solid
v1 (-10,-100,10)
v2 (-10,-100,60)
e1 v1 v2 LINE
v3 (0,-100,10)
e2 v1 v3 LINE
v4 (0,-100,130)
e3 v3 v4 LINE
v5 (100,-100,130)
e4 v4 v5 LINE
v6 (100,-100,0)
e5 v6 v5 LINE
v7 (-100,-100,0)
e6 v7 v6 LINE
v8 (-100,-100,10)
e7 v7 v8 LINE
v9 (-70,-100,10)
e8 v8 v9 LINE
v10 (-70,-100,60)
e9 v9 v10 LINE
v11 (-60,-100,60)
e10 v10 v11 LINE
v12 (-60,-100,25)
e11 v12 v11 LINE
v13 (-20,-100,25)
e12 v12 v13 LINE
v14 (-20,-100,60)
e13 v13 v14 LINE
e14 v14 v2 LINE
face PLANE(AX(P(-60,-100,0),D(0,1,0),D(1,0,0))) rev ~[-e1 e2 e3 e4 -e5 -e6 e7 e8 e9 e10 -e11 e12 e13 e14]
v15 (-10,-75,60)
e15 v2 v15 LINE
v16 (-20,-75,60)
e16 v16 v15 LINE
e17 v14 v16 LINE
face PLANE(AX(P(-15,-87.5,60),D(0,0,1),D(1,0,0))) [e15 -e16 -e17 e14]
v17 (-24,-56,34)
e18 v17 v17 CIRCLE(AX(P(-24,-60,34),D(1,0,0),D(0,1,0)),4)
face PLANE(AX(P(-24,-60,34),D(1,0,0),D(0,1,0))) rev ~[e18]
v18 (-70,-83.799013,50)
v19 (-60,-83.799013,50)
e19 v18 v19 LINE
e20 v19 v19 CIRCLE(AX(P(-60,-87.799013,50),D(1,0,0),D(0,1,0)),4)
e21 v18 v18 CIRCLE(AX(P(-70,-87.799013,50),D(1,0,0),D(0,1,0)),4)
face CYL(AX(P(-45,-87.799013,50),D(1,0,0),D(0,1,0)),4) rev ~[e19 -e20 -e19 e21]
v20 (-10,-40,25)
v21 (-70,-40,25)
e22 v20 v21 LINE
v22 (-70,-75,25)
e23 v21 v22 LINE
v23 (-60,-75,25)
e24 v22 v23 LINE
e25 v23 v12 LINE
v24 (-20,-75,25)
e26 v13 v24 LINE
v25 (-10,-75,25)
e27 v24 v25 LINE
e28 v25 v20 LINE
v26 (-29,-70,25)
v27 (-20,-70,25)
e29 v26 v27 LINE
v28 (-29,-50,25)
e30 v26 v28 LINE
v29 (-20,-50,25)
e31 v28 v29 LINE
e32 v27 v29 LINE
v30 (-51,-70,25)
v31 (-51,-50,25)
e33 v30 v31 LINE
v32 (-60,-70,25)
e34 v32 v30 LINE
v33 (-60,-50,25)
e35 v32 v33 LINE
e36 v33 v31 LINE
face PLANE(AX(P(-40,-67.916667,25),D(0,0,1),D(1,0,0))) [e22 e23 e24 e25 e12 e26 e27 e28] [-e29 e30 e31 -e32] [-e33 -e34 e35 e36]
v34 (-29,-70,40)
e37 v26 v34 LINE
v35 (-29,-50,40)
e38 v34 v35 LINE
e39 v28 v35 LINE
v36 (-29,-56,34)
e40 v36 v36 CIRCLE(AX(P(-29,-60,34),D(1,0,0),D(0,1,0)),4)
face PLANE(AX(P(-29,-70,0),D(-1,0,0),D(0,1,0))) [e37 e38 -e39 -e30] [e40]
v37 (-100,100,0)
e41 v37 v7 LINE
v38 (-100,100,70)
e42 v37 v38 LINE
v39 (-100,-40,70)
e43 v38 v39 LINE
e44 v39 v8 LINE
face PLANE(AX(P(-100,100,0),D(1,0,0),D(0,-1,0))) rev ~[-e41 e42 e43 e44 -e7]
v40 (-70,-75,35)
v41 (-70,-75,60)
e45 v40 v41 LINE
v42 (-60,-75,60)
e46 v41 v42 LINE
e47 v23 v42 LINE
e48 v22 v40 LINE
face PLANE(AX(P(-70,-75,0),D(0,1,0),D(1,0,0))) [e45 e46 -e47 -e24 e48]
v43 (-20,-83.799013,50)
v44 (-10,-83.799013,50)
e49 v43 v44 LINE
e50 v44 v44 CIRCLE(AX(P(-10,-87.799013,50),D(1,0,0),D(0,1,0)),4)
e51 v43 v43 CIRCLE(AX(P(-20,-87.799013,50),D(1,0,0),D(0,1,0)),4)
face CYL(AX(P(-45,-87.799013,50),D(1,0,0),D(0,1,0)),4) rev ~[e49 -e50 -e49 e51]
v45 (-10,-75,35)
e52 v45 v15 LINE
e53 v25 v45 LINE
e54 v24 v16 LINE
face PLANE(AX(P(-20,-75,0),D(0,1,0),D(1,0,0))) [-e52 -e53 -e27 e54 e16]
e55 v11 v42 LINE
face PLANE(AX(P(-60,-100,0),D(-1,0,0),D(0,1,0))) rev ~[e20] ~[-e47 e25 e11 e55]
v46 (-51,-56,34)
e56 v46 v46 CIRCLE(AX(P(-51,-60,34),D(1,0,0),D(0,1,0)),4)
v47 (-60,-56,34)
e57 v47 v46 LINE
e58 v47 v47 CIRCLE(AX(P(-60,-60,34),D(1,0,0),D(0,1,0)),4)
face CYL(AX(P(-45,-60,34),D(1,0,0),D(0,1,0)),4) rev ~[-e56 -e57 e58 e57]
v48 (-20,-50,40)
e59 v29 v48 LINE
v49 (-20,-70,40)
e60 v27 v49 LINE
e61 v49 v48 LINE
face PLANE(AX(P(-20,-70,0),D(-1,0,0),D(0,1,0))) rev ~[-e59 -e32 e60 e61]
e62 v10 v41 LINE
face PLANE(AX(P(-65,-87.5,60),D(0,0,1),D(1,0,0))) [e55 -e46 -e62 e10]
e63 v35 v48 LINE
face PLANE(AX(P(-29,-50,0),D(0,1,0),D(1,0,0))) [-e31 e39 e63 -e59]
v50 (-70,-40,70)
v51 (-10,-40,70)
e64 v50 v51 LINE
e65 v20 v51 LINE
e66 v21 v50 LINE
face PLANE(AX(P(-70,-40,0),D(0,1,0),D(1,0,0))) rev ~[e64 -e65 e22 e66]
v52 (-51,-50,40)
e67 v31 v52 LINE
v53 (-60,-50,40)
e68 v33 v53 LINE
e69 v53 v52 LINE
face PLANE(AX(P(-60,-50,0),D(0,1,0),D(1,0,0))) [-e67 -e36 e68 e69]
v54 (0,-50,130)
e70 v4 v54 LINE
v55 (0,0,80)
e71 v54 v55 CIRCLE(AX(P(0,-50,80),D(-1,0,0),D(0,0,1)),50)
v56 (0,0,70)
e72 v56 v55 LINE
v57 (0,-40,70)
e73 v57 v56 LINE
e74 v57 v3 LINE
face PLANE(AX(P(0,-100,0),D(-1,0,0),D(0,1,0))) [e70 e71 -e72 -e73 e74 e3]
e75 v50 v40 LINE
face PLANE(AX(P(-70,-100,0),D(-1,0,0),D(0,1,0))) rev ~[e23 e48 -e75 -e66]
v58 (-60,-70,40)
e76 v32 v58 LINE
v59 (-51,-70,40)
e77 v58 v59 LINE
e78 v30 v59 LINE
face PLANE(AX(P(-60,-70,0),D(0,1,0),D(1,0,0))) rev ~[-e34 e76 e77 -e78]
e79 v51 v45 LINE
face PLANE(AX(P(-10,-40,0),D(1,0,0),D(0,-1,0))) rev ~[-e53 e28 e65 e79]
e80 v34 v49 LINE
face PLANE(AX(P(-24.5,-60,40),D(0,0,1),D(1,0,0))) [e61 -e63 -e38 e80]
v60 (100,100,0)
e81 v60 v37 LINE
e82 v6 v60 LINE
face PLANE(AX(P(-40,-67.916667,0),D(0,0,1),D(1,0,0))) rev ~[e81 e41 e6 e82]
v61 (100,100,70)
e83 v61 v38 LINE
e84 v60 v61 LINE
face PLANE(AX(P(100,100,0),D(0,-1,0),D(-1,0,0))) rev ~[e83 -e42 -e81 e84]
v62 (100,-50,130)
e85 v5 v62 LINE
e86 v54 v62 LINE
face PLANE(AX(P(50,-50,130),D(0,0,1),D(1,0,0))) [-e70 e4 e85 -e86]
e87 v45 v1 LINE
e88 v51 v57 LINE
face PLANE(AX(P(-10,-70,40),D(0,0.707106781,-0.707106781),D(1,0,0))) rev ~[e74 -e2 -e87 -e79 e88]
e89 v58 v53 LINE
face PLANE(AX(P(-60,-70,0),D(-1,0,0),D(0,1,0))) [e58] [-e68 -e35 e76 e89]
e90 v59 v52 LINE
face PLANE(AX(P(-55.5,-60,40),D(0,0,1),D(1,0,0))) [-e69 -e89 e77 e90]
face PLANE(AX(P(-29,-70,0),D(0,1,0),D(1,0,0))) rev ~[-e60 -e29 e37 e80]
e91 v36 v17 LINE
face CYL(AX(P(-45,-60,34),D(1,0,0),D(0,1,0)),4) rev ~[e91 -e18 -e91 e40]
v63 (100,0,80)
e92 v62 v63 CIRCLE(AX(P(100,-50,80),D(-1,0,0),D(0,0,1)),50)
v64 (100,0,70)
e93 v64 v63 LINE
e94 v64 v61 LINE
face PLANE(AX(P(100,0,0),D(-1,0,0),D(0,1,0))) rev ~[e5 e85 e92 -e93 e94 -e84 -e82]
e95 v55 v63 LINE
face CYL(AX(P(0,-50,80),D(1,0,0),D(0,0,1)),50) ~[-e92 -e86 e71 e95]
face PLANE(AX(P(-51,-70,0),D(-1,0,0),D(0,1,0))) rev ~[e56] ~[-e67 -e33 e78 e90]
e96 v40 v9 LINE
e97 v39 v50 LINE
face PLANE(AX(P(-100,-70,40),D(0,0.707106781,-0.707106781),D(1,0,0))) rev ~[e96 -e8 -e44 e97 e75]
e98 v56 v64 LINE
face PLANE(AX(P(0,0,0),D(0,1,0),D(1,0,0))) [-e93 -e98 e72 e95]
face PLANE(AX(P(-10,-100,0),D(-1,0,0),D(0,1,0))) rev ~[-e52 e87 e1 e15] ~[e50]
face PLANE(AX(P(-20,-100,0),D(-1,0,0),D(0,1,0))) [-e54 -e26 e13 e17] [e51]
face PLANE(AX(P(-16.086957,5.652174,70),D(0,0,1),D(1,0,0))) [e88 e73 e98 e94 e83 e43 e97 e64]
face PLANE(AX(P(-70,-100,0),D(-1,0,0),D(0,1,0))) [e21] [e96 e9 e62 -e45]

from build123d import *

# Parameters (mm, degrees)
F1_DEPTH  = 70
F0_W      = 100
F0_H      = 100
F2_DEPTH  = 130
F3_R      = 50
F4_SIZE   = 60
F0_W_2    = 10
F0_H_2    = 25
F5_DEPTH  = 60
F0_W_3    = 9
F0_H_3    = 20
F6_DEPTH  = 25
F7_DEPTH  = 40
F9_R      = 4
F10_DEPTH = 21
F11_DEPTH = 36.4


with BuildPart() as f1:
    # F0 (on Top) → F1 (new body)
    with BuildSketch(Plane.XY):
        Polygon((-10, -100), (0, -100), (0, 0), (100, 0), (100, 100), (-100, 100), (-100, -100), (-80, -100), (-70, -100), (-70, -75), (-70, -40), (-10, -40), (-10, -75), align=None)
    extrude(amount=F1_DEPTH)

    # F0 (on Top) → F2 (join)
    with BuildSketch(Plane.XY):
        with Locations((50, -50)):
            Rectangle(F0_W, F0_H)
    extrude(amount=F2_DEPTH)

    # F3
    f3_edges = [f1.edges().sort_by_distance(p)[0] for p in [
        (50, 0, 130),
    ]]
    fillet(f3_edges, radius=F3_R)

    # F4
    f4_edges = [f1.edges().sort_by_distance(p)[0] for p in [
        (-85, -100, 70),
        (-5, -100, 70),
    ]]
    chamfer(f4_edges, length=F4_SIZE)

    # F0 (on Top) → F5 (join)
    with BuildSketch(Plane.XY):
        with Locations((-65, -87.5)):
            Rectangle(F0_W_2, F0_H_2)
        with Locations((-15, -87.5)):
            Rectangle(F0_W_2, F0_H_2)
    extrude(amount=F5_DEPTH)

    # F0 (on Top) → F6 (join)
    with BuildSketch(Plane.XY):
        Polygon((-60, -100), (-20, -100), (-20, -75), (-10, -75), (-10, -40), (-70, -40), (-70, -75), (-60, -75), align=None)
        with Locations((-55.5, -60)):
            Rectangle(F0_W_3, F0_H_3, mode=Mode.SUBTRACT)
        with Locations((-24.5, -60)):
            Rectangle(F0_W_3, F0_H_3, mode=Mode.SUBTRACT)
    extrude(amount=F6_DEPTH)

    # F0 (on Top) → F7 (join)
    with BuildSketch(Plane.XY):
        with Locations((-24.5, -60)):
            Rectangle(F0_W_3, F0_H_3)
        with Locations((-55.5, -60)):
            Rectangle(F0_W_3, F0_H_3)
    extrude(amount=F7_DEPTH)

    # F9 (on offset) → F10 (cut, symmetric)
    with BuildSketch(Plane.YZ.offset(-45)):
        with Locations((-60, 34)):
            Circle(F9_R)
    extrude(amount=F10_DEPTH, both=True, mode=Mode.SUBTRACT)

    # F9 (on offset) → F11 (cut, symmetric)
    with BuildSketch(Plane.YZ.offset(-45)):
        with Locations((-87.799012661, 50)):
            Circle(F9_R)
    extrude(amount=F11_DEPTH, both=True, mode=Mode.SUBTRACT)


solid = f1.part
